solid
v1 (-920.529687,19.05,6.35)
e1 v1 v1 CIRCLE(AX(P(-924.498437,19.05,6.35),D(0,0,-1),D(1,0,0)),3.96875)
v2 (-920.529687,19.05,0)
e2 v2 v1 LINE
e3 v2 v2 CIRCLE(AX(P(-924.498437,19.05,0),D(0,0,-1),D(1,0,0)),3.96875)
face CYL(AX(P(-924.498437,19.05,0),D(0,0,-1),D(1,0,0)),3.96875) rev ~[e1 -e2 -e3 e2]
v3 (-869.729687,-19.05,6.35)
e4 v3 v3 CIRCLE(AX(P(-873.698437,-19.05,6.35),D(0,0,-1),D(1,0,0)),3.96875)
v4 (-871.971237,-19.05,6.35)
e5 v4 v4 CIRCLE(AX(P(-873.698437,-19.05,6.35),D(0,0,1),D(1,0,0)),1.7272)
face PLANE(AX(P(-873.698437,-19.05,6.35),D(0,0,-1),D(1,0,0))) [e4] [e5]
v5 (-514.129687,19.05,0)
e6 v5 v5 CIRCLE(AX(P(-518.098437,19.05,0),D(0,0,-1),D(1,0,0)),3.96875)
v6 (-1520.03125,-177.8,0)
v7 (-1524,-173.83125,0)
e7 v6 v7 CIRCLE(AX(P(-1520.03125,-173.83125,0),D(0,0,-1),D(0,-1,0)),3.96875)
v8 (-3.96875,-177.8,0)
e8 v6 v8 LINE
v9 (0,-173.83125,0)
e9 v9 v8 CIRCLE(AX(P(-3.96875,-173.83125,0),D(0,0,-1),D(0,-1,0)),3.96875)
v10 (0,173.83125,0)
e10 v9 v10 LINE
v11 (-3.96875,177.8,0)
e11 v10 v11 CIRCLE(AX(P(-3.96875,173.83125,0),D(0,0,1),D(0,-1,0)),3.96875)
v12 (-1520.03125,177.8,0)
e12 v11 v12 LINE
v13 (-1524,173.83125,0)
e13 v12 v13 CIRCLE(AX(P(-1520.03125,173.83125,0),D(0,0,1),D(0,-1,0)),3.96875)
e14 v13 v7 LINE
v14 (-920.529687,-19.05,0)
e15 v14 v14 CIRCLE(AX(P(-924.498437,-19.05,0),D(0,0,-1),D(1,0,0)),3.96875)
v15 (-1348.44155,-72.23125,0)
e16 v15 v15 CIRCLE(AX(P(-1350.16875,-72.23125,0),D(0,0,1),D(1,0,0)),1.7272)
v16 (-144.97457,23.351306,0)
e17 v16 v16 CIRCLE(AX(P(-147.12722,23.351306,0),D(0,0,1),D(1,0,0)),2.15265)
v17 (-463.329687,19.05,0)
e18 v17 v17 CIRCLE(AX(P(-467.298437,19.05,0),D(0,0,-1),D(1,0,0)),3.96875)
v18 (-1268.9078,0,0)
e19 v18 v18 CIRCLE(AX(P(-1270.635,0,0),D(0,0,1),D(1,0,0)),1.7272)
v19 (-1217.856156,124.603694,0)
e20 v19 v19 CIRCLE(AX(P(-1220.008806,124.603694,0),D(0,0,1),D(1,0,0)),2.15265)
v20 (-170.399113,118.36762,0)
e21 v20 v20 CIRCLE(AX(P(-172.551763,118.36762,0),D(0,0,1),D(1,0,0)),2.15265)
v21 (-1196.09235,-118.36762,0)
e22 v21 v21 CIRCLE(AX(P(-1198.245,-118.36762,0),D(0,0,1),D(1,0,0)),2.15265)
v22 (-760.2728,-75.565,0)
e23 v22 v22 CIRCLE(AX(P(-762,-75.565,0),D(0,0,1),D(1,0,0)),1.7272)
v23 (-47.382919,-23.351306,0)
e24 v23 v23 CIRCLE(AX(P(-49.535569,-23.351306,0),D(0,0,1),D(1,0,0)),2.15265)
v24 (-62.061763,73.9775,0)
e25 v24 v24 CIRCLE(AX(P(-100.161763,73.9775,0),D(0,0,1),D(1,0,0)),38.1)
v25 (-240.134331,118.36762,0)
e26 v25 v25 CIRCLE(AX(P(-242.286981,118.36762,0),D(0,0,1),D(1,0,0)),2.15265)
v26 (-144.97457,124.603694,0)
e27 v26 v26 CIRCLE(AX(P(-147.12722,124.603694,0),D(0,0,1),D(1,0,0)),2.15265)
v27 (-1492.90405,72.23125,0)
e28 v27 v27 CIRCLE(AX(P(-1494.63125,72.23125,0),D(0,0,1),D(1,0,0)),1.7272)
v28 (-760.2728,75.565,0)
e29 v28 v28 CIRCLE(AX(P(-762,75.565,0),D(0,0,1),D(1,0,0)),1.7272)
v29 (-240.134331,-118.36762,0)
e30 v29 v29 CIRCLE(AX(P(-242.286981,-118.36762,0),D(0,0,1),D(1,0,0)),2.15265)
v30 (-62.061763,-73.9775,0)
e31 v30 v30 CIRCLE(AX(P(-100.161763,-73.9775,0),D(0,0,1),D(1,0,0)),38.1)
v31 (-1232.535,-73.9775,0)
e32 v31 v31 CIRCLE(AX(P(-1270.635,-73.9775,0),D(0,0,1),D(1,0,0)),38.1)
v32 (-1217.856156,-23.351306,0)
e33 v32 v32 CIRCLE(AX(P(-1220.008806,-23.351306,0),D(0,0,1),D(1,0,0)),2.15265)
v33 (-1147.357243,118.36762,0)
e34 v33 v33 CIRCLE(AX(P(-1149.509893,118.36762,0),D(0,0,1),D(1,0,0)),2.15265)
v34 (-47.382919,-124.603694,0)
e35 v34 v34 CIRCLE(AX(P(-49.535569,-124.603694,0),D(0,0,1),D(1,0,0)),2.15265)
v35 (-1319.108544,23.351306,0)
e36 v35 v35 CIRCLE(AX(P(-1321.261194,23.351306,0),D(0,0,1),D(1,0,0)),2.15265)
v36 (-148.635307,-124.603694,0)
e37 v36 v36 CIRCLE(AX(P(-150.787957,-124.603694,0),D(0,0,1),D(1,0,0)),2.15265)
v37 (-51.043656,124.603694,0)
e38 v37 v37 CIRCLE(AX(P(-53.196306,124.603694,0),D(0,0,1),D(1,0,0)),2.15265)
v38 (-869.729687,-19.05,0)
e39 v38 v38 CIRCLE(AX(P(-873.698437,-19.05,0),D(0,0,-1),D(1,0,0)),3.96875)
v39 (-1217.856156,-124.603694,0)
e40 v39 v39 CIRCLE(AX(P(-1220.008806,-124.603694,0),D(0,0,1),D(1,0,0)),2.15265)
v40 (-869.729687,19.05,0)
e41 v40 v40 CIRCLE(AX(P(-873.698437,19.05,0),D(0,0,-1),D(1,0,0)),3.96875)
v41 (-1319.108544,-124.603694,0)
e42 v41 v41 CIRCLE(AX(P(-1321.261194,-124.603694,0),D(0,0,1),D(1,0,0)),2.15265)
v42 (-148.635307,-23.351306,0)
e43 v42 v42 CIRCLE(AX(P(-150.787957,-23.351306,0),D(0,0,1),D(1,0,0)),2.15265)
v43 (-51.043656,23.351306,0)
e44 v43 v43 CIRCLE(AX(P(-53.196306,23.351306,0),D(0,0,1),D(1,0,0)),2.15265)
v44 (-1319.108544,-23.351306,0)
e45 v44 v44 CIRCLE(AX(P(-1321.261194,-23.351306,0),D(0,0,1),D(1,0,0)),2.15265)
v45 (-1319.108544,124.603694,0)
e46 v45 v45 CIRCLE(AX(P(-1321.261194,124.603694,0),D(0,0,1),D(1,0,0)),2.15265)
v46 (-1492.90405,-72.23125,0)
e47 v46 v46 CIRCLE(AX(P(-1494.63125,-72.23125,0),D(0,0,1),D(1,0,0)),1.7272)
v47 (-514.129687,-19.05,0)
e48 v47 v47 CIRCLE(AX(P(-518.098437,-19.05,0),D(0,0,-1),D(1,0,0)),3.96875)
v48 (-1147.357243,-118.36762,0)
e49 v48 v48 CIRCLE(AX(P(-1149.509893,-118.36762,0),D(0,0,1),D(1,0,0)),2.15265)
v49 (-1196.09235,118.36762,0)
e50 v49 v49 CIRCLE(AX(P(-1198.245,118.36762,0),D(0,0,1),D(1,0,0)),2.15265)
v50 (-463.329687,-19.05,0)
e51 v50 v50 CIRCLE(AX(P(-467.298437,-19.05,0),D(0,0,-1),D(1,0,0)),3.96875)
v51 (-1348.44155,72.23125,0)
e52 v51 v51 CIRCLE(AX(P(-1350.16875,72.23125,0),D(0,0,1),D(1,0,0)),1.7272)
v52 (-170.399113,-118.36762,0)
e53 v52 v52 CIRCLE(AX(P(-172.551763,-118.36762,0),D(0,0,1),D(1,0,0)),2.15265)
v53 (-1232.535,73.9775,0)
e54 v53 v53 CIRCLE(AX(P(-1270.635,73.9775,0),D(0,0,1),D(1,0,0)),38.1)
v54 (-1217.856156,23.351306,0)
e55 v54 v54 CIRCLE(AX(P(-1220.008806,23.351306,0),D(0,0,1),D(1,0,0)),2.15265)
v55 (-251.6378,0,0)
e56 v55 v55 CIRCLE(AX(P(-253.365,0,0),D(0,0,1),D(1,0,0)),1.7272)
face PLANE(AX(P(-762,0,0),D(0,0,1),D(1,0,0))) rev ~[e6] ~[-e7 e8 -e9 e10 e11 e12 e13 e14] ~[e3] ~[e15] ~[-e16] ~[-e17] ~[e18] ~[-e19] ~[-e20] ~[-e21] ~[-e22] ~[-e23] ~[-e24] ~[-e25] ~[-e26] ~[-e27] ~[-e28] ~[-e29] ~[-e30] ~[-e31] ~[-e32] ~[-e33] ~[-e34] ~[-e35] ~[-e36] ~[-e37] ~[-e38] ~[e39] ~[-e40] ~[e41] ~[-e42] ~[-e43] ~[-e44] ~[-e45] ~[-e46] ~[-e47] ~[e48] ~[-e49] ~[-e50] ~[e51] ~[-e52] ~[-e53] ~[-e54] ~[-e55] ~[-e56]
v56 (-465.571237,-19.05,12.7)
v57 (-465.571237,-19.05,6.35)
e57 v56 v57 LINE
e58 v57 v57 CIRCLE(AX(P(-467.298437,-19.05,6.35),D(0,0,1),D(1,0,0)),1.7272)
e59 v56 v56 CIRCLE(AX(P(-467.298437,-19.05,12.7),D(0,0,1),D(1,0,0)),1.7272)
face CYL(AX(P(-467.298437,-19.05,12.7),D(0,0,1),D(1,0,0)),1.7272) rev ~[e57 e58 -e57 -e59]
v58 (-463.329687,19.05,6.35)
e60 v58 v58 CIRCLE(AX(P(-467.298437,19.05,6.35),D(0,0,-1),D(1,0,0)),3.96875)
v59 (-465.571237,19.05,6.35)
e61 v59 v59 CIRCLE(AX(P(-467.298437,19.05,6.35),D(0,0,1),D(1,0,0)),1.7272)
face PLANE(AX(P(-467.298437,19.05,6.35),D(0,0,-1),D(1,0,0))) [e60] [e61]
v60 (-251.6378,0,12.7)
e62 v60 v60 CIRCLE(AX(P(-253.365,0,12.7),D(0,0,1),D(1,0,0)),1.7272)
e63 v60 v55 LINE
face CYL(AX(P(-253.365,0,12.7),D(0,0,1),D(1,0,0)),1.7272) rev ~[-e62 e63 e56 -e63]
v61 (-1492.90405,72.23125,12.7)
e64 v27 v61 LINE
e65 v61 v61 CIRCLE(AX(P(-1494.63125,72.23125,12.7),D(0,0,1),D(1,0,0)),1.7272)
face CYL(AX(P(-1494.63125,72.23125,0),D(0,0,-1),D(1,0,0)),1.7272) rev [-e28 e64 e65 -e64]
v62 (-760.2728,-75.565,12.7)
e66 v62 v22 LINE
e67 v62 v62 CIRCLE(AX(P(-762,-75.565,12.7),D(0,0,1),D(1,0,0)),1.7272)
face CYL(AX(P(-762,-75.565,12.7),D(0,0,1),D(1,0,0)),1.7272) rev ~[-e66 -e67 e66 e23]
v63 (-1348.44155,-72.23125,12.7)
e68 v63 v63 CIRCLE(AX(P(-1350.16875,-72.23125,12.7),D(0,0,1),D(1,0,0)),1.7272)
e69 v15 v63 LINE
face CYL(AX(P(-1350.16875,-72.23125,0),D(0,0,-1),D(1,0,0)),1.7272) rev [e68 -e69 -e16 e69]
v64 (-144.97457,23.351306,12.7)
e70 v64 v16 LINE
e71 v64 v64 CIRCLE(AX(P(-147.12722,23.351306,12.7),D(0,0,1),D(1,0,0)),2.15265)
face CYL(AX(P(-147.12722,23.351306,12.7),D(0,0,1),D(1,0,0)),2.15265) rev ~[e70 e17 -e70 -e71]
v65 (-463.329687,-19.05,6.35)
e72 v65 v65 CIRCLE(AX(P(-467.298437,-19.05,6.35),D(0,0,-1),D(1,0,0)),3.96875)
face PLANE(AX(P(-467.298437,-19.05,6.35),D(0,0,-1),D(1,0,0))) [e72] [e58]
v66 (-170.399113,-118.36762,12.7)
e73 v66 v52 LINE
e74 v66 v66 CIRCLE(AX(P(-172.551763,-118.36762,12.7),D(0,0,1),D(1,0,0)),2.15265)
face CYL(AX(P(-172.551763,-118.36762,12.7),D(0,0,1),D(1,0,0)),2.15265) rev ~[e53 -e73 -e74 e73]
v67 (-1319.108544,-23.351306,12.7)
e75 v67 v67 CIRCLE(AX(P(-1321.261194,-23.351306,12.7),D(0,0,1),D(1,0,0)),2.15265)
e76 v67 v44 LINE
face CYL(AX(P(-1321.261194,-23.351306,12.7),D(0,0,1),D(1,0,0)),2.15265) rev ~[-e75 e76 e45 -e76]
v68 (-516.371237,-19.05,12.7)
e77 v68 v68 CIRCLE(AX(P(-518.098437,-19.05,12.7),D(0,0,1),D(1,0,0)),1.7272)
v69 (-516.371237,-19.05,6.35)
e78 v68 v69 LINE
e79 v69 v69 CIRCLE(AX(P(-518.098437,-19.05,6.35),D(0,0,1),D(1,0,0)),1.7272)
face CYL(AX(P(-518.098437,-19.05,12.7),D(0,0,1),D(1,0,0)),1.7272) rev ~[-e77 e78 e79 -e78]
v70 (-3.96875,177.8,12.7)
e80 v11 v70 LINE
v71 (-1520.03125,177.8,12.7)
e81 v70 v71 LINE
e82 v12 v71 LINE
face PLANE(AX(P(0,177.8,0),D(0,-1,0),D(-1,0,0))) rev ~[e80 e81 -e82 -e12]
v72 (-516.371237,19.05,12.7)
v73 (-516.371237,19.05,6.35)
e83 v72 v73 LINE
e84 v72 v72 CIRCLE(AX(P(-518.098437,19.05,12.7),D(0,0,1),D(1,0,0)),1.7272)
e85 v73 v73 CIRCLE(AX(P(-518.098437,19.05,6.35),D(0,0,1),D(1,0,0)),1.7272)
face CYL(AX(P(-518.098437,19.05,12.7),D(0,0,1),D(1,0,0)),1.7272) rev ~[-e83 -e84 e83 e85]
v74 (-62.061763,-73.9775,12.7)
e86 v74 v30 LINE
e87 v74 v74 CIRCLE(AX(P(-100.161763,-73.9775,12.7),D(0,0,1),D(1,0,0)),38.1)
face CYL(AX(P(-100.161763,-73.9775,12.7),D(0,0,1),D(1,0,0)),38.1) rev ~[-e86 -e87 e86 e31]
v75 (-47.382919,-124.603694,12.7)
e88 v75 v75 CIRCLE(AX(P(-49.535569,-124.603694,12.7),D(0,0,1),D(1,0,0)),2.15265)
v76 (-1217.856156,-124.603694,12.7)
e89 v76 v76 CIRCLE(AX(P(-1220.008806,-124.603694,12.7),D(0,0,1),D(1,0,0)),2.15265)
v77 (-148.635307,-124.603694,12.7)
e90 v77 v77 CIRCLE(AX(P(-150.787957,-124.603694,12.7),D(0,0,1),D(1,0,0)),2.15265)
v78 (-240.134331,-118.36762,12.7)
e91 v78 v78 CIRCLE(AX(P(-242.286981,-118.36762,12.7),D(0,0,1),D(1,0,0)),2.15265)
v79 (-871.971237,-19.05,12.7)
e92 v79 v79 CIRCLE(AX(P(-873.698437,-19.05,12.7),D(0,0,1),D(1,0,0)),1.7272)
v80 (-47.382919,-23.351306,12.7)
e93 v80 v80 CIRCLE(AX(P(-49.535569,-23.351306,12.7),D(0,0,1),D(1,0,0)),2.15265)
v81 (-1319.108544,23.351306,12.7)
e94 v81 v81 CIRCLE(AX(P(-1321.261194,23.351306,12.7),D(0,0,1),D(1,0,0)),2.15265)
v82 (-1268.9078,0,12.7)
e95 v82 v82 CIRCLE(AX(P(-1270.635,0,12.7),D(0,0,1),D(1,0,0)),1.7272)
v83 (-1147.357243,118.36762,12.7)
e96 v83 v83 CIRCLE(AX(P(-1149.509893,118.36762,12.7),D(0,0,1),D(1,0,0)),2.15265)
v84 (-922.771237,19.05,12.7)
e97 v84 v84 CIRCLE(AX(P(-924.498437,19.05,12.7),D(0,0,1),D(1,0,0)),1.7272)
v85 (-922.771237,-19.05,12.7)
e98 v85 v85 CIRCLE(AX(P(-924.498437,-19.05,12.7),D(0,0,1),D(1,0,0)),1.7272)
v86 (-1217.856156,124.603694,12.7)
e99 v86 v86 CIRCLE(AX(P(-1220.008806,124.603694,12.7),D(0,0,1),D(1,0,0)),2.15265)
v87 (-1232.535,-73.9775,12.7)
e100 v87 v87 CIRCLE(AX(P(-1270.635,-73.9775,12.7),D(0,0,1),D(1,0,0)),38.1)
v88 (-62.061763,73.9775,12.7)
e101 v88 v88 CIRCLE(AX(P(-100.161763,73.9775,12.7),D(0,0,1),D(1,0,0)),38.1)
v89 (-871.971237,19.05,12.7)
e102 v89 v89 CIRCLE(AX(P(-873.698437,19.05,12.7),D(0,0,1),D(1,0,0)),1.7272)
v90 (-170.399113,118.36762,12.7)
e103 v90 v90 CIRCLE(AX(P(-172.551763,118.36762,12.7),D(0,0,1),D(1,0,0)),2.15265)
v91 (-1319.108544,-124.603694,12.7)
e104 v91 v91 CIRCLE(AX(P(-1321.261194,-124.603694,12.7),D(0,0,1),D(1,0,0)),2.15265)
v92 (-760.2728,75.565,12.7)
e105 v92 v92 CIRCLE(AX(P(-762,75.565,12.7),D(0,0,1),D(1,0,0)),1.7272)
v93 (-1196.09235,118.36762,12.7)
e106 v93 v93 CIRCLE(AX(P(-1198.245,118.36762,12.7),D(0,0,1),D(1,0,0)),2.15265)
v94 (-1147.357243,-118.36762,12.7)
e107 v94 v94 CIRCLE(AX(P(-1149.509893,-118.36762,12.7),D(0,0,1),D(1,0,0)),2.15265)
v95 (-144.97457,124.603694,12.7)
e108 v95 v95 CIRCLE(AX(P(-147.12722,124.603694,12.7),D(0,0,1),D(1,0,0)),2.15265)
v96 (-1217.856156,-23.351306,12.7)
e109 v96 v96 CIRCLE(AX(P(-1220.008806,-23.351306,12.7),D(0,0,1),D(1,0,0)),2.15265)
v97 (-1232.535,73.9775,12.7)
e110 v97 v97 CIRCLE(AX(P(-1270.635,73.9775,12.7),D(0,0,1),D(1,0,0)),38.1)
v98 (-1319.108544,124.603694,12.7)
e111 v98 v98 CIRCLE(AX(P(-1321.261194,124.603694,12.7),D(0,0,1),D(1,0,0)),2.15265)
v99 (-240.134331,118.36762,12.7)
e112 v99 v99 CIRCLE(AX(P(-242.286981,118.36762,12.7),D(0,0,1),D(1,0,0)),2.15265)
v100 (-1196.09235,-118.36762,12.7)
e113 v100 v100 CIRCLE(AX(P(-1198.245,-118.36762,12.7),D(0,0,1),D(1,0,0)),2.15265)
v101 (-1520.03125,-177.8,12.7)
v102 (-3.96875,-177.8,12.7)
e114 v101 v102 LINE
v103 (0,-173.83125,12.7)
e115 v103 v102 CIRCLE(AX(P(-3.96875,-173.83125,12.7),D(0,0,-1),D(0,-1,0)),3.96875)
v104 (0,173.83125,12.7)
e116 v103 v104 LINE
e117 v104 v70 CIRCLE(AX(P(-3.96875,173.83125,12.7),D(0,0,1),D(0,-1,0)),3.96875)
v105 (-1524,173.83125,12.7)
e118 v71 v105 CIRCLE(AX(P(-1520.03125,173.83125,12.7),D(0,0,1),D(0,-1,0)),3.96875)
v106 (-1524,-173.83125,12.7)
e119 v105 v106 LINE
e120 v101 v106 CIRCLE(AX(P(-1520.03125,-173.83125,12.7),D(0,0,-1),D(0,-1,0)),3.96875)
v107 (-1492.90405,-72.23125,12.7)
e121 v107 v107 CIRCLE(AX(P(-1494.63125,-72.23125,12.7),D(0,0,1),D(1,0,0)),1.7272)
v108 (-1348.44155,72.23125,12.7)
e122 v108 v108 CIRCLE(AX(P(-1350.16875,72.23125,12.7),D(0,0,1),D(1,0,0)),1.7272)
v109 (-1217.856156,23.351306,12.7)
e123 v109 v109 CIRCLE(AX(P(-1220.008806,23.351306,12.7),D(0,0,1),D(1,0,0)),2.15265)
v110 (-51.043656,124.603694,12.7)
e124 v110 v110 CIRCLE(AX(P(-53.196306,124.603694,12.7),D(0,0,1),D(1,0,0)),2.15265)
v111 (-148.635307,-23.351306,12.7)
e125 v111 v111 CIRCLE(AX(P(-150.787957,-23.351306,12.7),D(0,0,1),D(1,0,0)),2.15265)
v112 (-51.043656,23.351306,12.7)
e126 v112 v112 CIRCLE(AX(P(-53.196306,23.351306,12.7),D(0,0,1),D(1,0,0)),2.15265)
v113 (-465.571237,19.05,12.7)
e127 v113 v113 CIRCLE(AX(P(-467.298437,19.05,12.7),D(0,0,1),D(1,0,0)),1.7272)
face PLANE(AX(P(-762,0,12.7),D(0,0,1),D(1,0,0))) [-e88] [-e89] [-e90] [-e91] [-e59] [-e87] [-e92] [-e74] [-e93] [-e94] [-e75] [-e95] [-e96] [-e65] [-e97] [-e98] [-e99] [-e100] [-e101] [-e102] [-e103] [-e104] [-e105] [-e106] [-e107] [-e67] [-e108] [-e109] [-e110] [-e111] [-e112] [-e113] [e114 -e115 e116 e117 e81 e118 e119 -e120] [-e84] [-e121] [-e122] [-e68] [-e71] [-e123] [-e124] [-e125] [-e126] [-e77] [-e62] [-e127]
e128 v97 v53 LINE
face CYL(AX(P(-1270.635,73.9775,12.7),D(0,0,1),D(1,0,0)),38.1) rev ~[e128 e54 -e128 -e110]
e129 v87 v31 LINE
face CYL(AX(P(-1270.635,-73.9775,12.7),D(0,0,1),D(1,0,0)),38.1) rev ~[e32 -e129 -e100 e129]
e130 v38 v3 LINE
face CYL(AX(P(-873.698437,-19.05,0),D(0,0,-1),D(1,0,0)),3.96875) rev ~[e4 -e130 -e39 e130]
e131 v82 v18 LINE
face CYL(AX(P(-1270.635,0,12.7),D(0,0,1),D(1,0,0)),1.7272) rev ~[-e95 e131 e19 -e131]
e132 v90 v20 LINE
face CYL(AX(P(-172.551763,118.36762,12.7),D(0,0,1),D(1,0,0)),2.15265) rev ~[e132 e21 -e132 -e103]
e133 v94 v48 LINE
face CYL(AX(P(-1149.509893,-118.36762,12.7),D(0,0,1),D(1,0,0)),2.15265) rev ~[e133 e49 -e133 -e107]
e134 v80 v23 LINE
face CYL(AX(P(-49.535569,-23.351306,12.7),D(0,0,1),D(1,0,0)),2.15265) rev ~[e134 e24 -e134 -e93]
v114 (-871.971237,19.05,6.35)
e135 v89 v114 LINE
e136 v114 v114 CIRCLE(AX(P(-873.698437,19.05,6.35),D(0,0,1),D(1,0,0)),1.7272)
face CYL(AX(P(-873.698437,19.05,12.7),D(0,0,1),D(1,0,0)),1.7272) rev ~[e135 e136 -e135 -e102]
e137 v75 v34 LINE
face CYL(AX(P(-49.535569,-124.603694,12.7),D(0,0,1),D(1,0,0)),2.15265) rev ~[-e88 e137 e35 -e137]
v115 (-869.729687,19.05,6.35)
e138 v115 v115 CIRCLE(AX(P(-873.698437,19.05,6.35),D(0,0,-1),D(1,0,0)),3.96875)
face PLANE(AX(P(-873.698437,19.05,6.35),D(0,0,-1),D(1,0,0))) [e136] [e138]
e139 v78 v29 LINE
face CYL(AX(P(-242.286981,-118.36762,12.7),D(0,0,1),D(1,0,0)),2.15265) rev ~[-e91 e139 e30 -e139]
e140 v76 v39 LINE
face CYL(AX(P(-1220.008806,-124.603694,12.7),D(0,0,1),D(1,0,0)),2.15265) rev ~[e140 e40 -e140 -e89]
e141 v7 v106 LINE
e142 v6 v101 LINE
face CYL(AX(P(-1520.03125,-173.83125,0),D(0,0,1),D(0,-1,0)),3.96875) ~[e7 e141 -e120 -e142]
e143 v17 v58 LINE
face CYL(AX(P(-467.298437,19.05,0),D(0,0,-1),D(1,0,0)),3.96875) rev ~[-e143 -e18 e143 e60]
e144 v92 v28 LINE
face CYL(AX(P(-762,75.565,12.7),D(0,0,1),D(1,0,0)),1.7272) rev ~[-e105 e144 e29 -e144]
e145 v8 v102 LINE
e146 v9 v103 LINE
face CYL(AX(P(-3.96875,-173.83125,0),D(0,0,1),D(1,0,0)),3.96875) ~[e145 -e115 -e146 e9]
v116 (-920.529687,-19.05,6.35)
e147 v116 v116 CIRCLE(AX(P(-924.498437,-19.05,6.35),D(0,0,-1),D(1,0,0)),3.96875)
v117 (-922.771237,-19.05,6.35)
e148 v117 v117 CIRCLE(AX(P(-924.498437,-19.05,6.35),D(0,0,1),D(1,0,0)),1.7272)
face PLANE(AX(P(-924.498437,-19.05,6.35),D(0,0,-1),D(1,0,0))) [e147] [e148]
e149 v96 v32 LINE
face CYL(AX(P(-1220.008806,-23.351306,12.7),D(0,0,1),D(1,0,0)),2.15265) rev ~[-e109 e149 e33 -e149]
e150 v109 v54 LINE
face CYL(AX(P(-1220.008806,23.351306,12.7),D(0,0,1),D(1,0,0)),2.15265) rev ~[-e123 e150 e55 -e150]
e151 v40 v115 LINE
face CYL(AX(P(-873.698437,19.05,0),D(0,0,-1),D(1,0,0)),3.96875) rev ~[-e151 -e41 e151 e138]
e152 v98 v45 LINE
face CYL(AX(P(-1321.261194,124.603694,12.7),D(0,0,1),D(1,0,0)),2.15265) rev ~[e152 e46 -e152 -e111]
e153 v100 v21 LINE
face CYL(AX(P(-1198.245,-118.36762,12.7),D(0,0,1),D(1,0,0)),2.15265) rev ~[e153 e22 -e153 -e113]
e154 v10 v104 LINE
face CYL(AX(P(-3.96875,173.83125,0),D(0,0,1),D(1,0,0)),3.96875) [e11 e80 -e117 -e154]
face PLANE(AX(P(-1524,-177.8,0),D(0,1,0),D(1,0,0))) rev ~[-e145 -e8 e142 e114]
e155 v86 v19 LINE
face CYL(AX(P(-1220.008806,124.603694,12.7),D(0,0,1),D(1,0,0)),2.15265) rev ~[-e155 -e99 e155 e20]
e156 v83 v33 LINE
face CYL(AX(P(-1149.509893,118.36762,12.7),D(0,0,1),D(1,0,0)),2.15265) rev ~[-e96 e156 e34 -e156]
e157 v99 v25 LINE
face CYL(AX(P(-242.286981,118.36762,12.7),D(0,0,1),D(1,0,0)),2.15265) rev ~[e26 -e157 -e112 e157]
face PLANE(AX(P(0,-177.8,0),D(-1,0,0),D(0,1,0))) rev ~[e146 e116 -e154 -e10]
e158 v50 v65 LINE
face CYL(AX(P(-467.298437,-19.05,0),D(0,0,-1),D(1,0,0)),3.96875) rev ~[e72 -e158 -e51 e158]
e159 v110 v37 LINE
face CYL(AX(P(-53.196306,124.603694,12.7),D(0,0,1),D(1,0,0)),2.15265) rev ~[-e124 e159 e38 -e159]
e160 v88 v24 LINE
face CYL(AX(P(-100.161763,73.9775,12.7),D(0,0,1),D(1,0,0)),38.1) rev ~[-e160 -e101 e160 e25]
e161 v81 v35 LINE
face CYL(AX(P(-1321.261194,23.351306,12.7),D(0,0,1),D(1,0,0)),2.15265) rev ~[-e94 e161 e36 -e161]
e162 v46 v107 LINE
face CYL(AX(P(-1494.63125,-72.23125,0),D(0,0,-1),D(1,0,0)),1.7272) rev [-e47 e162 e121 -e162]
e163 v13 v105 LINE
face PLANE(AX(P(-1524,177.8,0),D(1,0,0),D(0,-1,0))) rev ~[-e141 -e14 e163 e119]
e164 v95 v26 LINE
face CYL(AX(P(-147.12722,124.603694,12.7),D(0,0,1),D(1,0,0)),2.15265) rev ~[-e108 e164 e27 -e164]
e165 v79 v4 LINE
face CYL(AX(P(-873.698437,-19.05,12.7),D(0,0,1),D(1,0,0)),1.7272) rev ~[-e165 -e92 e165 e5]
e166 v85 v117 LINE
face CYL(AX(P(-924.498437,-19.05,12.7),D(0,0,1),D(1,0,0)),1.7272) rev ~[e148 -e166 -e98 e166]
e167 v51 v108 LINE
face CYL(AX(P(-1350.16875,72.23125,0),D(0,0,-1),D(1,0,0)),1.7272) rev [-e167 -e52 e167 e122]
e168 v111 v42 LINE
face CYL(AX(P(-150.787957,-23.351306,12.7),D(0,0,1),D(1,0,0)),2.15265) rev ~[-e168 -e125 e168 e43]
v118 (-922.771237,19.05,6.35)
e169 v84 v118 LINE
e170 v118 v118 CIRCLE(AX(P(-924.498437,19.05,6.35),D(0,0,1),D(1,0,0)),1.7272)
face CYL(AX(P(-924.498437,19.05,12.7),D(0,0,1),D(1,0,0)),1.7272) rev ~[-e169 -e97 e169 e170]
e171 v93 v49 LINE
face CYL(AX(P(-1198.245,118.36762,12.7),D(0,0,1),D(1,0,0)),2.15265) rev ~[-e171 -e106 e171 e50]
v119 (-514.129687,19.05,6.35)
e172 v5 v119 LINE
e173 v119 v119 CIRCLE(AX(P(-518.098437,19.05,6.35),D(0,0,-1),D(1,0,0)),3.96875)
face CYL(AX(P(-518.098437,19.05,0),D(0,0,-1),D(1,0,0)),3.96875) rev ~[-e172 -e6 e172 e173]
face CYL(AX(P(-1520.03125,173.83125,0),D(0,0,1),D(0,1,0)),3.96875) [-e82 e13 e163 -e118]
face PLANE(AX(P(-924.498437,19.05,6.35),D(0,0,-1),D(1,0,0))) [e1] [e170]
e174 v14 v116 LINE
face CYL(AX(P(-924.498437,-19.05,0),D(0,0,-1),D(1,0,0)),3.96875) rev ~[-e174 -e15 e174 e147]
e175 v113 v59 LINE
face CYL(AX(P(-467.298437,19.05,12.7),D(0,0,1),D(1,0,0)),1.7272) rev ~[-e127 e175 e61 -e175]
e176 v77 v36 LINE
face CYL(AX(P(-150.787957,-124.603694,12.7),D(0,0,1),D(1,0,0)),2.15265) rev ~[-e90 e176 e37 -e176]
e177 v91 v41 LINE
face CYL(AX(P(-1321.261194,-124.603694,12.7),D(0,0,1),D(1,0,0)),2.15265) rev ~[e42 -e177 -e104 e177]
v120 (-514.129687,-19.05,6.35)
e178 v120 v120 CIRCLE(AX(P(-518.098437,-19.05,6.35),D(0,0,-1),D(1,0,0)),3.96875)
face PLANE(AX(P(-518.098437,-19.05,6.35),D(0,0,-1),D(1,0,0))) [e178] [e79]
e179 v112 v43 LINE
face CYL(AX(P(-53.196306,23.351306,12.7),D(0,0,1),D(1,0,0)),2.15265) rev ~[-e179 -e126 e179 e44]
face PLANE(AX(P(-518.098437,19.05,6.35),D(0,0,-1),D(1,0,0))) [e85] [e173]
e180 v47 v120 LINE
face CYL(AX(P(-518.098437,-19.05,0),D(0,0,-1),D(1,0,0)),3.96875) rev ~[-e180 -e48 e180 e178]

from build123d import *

# Parameters (mm, degrees)
F0_R     = 1.7272
F1_DEPTH = 12.7
F2_R     = 1.7272
F2_R_2   = 38.1
F2_R_3   = 2.15265
F3_DEPTH = 12.7
F4_R     = 1.7272
F4_R_2   = 2.15265
F5_DEPTH = 12.7
F6_R     = 3.96875
F7_DEPTH = 6.35
F8_R     = 3.96875


# Not quite as in the source:
# - a feature names something its author has since deleted; it is built from what else it names


with BuildPart() as f1:
    # F0 (on Top) → F1 (new body)
    with BuildSketch(Plane.XY):
        Polygon((0, -177.8), (0, 0), (0, 177.8), (-1524, 177.8), (-1524, -177.8), align=None)
        with Locations((-1494.63125, -72.23125)):
            Circle(F0_R, mode=Mode.SUBTRACT)
        with Locations((-1350.16875, -72.23125)):
            Circle(F0_R, mode=Mode.SUBTRACT)
        with Locations((-1494.63125, 72.23125)):
            Circle(F0_R, mode=Mode.SUBTRACT)
        with Locations((-1350.16875, 72.23125)):
            Circle(F0_R, mode=Mode.SUBTRACT)
    extrude(amount=F1_DEPTH)

    # F2 (on face) → F3 (cut, through all)
    with BuildSketch(Plane.XY.offset(12.7)):
        with Locations((-1270.635, 0)):
            Circle(F2_R)
        with Locations((-762, -75.565)):
            Circle(F2_R)
        with Locations((-762, 75.565)):
            Circle(F2_R)
        with Locations((-253.365, 0)):
            Circle(F2_R)
        with Locations((-100.1617631794, 73.9775)):
            Circle(F2_R_2)
        with Locations((-100.1617631794, -73.9775)):
            Circle(F2_R_2)
        with Locations((-1270.635, 73.9775)):
            Circle(F2_R_2)
        with Locations((-1270.635, -73.9775)):
            Circle(F2_R_2)
        with Locations((-150.7879570619, -124.6036938825)):
            Circle(F2_R_3)
        with Locations((-49.5355692968, -124.6036938825)):
            Circle(F2_R_3)
        with Locations((-49.5355692968, -23.3513061175)):
            Circle(F2_R_3)
        with Locations((-150.7879570619, -23.3513061175)):
            Circle(F2_R_3)
        with Locations((-147.1272202412, 23.3513061175)):
            Circle(F2_R_3)
        with Locations((-147.1272202412, 124.6036938825)):
            Circle(F2_R_3)
        with Locations((-53.1963061175, 124.6036938825)):
            Circle(F2_R_3)
        with Locations((-53.1963061175, 23.3513061175)):
            Circle(F2_R_3)
        with Locations((-1321.2611938825, -124.6036938825)):
            Circle(F2_R_3)
        with Locations((-1220.0088061175, -124.6036938825)):
            Circle(F2_R_3)
        with Locations((-1220.0088061175, -23.3513061175)):
            Circle(F2_R_3)
        with Locations((-1321.2611938825, -23.3513061175)):
            Circle(F2_R_3)
        with Locations((-1321.2611938825, 23.3513061175)):
            Circle(F2_R_3)
        with Locations((-1220.0088061175, 23.3513061175)):
            Circle(F2_R_3)
        with Locations((-1220.0088061175, 124.6036938825)):
            Circle(F2_R_3)
        with Locations((-1321.2611938825, 124.6036938825)):
            Circle(F2_R_3)
    extrude(amount=-F3_DEPTH, mode=Mode.SUBTRACT)

    # F4 (on face) → F5 (cut, through all)
    with BuildSketch(Plane.XY.offset(12.7)):
        with Locations((-467.2984367897, -19.05)):
            Circle(F4_R)
        with Locations((-518.0984367897, -19.05)):
            Circle(F4_R)
        with Locations((-518.0984367897, 19.05)):
            Circle(F4_R)
        with Locations((-467.2984367897, 19.05)):
            Circle(F4_R)
        with Locations((-873.6984367897, 19.05)):
            Circle(F4_R)
        with Locations((-873.6984367897, -19.05)):
            Circle(F4_R)
        with Locations((-924.4984367897, -19.05)):
            Circle(F4_R)
        with Locations((-924.4984367897, 19.05)):
            Circle(F4_R)
        with Locations((-172.5517631794, 118.3676195)):
            Circle(F4_R_2)
        with Locations((-242.2869805794, 118.3676195)):
            Circle(F4_R_2)
        with Locations((-242.2869805794, -118.3676195)):
            Circle(F4_R_2)
        with Locations((-172.5517631794, -118.3676195)):
            Circle(F4_R_2)
        with Locations((-1198.245, -118.3676195)):
            Circle(F4_R_2)
        with Locations((-1149.509893, -118.3676195)):
            Circle(F4_R_2)
        with Locations((-1198.245, 118.3676195)):
            Circle(F4_R_2)
        with Locations((-1149.509893, 118.3676195)):
            Circle(F4_R_2)
    extrude(amount=-F5_DEPTH, mode=Mode.SUBTRACT)

    # F6 (on face) → F7 (cut)
    with BuildSketch(Plane(origin=(0, 0, 0), x_dir=(1, 0, 0), z_dir=(0, 0, -1))):
        with Locations((-924.4984367897, -19.05)):
            Circle(F6_R)
        with Locations((-873.6984367897, -19.05)):
            Circle(F6_R)
        with Locations((-873.6984367897, 19.05)):
            Circle(F6_R)
        with Locations((-924.4984367897, 19.05)):
            Circle(F6_R)
        with Locations((-467.2984367897, -19.05)):
            Circle(F6_R)
        with Locations((-467.2984367897, 19.05)):
            Circle(F6_R)
        with Locations((-518.0984367897, 19.05)):
            Circle(F6_R)
        with Locations((-518.0984367897, -19.05)):
            Circle(F6_R)
    extrude(amount=-F7_DEPTH, mode=Mode.SUBTRACT)

    # F8
    f8_edges = [f1.edges().sort_by_distance(p)[0] for p in [
        (-1524, 177.8, 6.35),
        (-1524, -177.8, 6.35),
        (0, -177.8, 6.35),
        (0, 177.8, 6.35),
    ]]
    fillet(f8_edges, radius=F8_R)


solid = f1.part
